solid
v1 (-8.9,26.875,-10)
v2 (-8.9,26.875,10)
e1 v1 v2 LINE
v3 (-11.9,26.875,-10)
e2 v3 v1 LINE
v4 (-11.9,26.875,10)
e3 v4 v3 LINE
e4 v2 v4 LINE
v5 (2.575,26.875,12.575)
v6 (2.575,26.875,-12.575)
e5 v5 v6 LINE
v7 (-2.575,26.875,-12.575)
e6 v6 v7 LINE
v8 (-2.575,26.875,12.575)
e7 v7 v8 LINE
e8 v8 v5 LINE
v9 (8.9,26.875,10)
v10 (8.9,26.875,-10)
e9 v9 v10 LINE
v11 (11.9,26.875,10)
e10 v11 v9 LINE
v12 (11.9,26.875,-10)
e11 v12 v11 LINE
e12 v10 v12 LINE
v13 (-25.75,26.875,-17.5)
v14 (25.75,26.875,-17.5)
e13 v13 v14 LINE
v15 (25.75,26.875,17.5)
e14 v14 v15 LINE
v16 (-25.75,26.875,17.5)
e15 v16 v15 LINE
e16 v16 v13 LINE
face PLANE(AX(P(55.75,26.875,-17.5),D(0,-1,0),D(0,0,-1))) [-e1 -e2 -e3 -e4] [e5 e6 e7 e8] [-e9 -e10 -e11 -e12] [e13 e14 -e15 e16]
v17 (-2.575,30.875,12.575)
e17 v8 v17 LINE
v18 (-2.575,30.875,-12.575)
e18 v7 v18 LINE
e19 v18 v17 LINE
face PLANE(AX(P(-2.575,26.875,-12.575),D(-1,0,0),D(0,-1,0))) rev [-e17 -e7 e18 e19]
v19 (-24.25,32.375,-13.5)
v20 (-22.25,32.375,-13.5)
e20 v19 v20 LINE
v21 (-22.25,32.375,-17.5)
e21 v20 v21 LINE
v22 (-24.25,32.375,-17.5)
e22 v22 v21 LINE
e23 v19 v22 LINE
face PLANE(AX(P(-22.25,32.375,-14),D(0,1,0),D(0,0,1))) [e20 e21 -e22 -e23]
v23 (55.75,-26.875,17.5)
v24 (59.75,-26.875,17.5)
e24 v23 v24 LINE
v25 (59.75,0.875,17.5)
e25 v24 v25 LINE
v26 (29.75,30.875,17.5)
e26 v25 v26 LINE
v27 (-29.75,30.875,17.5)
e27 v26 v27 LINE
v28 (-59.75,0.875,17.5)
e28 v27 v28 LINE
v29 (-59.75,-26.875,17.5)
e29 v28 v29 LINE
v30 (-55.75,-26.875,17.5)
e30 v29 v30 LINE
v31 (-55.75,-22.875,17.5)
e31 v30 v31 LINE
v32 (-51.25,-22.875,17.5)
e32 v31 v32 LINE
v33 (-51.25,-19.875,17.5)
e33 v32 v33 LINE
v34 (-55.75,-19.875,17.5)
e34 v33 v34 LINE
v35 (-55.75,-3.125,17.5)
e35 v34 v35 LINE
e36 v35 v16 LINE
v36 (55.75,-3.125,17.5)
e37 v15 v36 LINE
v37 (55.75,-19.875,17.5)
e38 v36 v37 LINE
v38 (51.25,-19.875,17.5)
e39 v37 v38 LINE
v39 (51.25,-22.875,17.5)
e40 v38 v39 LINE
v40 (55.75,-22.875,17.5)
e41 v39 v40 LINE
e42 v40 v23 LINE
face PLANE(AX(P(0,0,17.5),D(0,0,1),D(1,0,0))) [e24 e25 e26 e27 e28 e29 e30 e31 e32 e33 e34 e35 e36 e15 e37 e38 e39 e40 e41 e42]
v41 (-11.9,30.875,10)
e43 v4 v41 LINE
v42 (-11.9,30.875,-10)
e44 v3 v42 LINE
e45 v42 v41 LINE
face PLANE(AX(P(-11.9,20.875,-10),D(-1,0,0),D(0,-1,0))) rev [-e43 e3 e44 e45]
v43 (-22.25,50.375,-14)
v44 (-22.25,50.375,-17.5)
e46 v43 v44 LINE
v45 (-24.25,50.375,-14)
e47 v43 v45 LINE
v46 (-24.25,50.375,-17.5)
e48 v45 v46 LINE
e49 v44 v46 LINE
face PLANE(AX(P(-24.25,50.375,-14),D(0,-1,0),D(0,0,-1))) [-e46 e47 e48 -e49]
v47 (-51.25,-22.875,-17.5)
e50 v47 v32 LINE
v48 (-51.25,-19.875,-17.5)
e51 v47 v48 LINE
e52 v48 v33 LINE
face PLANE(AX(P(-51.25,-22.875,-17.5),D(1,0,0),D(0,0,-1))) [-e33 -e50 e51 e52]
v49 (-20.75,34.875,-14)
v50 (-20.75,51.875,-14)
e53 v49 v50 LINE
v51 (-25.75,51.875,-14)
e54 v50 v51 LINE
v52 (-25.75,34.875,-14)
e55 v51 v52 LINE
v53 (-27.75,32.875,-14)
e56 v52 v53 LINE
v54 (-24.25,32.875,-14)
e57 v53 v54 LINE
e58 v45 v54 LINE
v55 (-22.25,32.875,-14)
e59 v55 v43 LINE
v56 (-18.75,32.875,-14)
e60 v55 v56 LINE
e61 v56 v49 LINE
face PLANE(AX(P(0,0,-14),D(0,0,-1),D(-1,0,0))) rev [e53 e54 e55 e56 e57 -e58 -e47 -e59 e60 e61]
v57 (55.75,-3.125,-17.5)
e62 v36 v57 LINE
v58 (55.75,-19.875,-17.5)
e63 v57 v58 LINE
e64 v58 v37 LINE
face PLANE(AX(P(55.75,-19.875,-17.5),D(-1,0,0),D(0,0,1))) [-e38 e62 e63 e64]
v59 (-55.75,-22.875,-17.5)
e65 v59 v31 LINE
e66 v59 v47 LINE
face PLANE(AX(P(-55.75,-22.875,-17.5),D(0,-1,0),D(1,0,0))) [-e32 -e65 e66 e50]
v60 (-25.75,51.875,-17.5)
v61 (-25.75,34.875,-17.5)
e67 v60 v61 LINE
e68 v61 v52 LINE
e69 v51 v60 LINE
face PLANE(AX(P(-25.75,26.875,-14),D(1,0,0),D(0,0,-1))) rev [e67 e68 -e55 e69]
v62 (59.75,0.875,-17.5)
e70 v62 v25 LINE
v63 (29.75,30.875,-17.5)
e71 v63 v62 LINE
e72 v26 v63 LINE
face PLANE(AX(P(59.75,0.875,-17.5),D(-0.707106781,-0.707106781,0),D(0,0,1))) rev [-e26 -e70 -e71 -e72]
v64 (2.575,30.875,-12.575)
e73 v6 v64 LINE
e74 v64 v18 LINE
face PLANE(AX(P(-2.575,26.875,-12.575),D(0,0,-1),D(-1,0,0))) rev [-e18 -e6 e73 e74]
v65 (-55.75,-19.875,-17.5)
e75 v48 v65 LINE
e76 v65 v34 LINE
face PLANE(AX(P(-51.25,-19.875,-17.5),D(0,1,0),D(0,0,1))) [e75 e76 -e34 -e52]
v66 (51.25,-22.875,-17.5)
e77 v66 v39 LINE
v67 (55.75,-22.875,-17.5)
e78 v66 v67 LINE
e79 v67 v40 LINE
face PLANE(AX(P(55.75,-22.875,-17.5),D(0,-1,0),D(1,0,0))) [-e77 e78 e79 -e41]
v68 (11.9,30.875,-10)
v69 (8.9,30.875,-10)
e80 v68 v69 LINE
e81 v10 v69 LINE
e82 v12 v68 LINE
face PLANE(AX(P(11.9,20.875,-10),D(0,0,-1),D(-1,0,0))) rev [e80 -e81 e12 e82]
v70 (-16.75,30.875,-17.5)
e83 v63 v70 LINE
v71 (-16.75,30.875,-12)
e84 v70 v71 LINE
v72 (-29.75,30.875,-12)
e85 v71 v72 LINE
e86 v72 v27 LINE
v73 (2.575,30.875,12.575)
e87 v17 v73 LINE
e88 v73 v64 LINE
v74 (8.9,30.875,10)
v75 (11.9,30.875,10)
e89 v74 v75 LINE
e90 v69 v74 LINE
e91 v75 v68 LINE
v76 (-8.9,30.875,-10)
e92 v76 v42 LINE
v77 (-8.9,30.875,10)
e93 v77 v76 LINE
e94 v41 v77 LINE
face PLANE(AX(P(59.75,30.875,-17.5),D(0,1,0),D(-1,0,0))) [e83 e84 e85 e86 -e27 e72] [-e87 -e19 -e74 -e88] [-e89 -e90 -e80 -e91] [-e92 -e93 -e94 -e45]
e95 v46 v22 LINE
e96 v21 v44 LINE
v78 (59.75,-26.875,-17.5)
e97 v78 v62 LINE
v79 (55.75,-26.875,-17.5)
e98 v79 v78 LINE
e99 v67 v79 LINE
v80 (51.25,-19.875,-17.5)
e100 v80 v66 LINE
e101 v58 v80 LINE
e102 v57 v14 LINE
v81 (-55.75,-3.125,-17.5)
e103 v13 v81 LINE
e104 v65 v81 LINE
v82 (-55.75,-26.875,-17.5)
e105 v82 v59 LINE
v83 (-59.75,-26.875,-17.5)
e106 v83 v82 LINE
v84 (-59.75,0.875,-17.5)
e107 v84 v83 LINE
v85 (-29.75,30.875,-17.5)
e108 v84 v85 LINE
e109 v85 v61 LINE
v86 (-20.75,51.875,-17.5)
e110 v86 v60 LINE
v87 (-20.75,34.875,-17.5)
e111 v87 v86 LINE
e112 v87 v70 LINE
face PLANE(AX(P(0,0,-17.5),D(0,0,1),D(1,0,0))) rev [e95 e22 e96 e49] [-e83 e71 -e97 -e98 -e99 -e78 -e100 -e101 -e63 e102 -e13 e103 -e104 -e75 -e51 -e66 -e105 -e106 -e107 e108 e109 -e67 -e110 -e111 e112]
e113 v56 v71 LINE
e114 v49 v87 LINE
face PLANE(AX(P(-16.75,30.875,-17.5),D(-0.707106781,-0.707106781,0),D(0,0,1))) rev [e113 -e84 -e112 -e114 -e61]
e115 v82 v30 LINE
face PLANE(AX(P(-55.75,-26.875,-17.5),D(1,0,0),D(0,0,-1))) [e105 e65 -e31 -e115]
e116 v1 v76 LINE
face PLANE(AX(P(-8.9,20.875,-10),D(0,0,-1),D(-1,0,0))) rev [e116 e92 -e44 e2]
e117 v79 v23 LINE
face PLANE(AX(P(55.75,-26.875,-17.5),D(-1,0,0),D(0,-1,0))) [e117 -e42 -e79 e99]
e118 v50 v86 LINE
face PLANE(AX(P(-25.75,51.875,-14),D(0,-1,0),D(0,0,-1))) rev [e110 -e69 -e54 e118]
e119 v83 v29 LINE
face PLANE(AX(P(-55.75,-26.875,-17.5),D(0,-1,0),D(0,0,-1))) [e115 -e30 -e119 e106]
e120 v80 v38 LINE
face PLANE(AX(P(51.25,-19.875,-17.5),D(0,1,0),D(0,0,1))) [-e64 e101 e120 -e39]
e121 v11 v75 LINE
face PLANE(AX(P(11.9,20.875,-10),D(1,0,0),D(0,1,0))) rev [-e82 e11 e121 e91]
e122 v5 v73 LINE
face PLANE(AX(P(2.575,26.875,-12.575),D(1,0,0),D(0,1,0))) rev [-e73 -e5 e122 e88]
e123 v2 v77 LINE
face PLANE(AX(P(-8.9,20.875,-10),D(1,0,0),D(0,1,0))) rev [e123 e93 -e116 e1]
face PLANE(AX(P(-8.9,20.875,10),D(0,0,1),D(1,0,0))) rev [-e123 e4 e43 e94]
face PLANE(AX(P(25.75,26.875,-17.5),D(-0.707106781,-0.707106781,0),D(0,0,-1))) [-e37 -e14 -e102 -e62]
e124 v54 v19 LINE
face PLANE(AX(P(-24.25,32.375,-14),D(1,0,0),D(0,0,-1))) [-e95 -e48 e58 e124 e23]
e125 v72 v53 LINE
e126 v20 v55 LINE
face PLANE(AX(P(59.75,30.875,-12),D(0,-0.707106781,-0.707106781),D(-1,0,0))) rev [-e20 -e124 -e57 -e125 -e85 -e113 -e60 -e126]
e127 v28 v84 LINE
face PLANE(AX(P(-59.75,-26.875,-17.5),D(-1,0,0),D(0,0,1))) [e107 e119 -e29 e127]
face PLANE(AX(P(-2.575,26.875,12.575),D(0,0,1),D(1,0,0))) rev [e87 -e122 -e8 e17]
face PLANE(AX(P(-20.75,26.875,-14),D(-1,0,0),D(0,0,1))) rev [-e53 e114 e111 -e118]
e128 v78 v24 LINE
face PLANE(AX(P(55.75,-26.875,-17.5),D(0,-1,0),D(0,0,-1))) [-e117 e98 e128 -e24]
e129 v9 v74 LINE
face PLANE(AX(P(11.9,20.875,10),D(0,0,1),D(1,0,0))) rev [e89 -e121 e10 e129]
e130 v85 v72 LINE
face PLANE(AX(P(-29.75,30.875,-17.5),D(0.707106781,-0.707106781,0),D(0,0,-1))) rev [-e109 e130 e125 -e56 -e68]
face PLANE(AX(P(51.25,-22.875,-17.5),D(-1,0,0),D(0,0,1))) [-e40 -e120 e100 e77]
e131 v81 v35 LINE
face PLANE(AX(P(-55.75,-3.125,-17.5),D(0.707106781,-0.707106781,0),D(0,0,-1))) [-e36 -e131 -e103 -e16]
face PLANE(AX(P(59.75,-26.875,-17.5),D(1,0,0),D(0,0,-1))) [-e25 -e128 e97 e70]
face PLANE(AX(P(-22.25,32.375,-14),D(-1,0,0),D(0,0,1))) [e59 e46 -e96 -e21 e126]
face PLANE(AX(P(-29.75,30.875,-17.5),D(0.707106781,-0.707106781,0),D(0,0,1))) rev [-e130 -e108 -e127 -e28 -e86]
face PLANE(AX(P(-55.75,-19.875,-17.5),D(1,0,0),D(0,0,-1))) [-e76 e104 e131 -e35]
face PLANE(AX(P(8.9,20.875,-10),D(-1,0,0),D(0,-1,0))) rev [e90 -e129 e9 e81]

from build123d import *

# Parameters (mm, degrees)
BOSS_EXTRUDE1_DEPTH = 17.5
CHAMFER1_SIZE       = 30
SKETCH6_W           = 5.15
SKETCH6_H           = 25.15
CUT_EXTRUDE2_DEPTH  = 4
SKETCH7_W           = 3
SKETCH7_H           = 20
CUT_EXTRUDE3_DEPTH  = 10
SKETCH8_W           = 5
SKETCH8_H           = 25
SKETCH8_W_2         = 2
SKETCH8_H_2         = 18
BOSS_EXTRUDE2_DEPTH = 3.5
CHAMFER2_SIZE       = 4
CHAMFER3_SIZE       = 2


# Some blends are built 0.0001 mm under size
with BuildPart() as part:
    # Sketch1 → Boss-Extrude1 (new, symmetric)
    with BuildSketch(Plane.XY):
        Polygon((55.75, -26.875), (55.75, -22.875), (51.25, -22.875), (51.25, -19.875), (55.75, -19.875), (55.75, 26.875), (-55.75, 26.875), (-55.75, -19.875), (-51.25, -19.875), (-51.25, -22.875), (-55.75, -22.875), (-55.75, -26.875), (-59.75, -26.875), (-59.75, 30.875), (59.75, 30.875), (59.75, -26.875), align=None)
    extrude(amount=BOSS_EXTRUDE1_DEPTH, both=True)

    # Chamfer1
    chamfer1_edges = [part.edges().sort_by_distance(p)[0] for p in [
        (-59.75, 30.875, 0),
        (59.75, 30.875, 0),
        (55.75, 26.875, 0),
        (-55.75, 26.875, 0),
    ]]
    chamfer(chamfer1_edges, length=CHAMFER1_SIZE)

    # Sketch6 → Cut-Extrude2 (cut)
    with BuildSketch(Plane(origin=(0, 30.875, 0), x_dir=(1, 0, 0), z_dir=(0, 1, 0))):
        Rectangle(SKETCH6_W, SKETCH6_H)
    extrude(amount=-CUT_EXTRUDE2_DEPTH, mode=Mode.SUBTRACT)

    # Sketch7 → Cut-Extrude3 (cut)
    with BuildSketch(Plane(origin=(0, 30.875, 0), x_dir=(1, 0, 0), z_dir=(0, 1, 0))):
        with Locations((10.4, 0)):
            Rectangle(SKETCH7_W, SKETCH7_H)
        with Locations((-10.4, 0)):
            Rectangle(SKETCH7_W, SKETCH7_H)
    extrude(amount=-CUT_EXTRUDE3_DEPTH, mode=Mode.SUBTRACT)

    # Sketch8 → Boss-Extrude2 (add)
    with BuildSketch(Plane.XY.offset(-17.5)):
        with Locations((-23.25, 39.375)):
            Rectangle(SKETCH8_W, SKETCH8_H)
        with Locations((-23.25, 41.375)):
            Rectangle(SKETCH8_W_2, SKETCH8_H_2, mode=Mode.SUBTRACT)
    extrude(amount=BOSS_EXTRUDE2_DEPTH)

    # Chamfer2
    chamfer2_edges = [part.edges().sort_by_distance(p)[0] for p in [
        (-20.75, 30.875, -15.75),
        (-25.75, 30.875, -15.75),
    ]]
    chamfer(chamfer2_edges, length=CHAMFER2_SIZE - 0.0001)  # a hair under: the kernel refuses the full size

    # Chamfer3
    # the kernel refuses this chamfer: 2 mm, written as the material it adds along each edge
    with BuildSketch(Plane(origin=(-11.606734024, 30.875, -14), x_dir=(0, 0.9996219169112968, -0.02749587661058651), z_dir=(-1, 0, 0))) as chamfer3_piece_1_section:
        Polygon((CHAMFER3_SIZE * 0.999621916911, -CHAMFER3_SIZE * 0.0274958766106), (-CHAMFER3_SIZE * 0.0274958766106, -CHAMFER3_SIZE * 0.999621916911), (0, 0), align=None)
    chamfer3_piece_1 = extrude(amount=23.286531952, mode=Mode.PRIVATE)
    chamfer3_piece_1 = split(chamfer3_piece_1, bisect_by=Plane(origin=(-22.25, 32.567452132, -13.881504022), z_dir=(1, 0, 0)), keep=Keep.TOP, mode=Mode.PRIVATE)
    chamfer3_piece_1 = split(chamfer3_piece_1, bisect_by=Plane(origin=(-19.394414099, 33.519314099, -13.881504022), z_dir=(-0.7071067811865476, -0.7071067811865476, 0)), keep=Keep.TOP, mode=Mode.PRIVATE)
    chamfer3_piece_1 = split(chamfer3_piece_1, bisect_by=Plane(origin=(-20.346276066, 32.375, -13.881504022), z_dir=(0, 1, 0)), keep=Keep.TOP, mode=Mode.PRIVATE)
    add(chamfer3_piece_1)
    with BuildSketch(Plane(origin=(-11.606734024, 30.875, -14), x_dir=(0, 0.9996219169112968, -0.02749587661058651), z_dir=(-1, 0, 0))) as chamfer3_piece_2_section:
        Polygon((CHAMFER3_SIZE * 0.999621916911, -CHAMFER3_SIZE * 0.0274958766106), (-CHAMFER3_SIZE * 0.0274958766106, -CHAMFER3_SIZE * 0.999621916911), (0, 0), align=None)
    chamfer3_piece_2 = extrude(amount=23.286531952, mode=Mode.PRIVATE)
    chamfer3_piece_2 = split(chamfer3_piece_2, bisect_by=Plane(origin=(-22.25, 31.41379866, -13.276536182), z_dir=(1, 0, 0)), keep=Keep.TOP, mode=Mode.PRIVATE)
    chamfer3_piece_2 = split(chamfer3_piece_2, bisect_by=Plane(origin=(-18.529173995, 32.654073995, -13.276536182), z_dir=(-0.7071067811865476, -0.7071067811865476, 0)), keep=Keep.TOP, mode=Mode.PRIVATE)
    chamfer3_piece_2 = split(chamfer3_piece_2, bisect_by=Plane(origin=(-19.76944933, 32.375, -13.276536182), z_dir=(0, -1, 0)), keep=Keep.TOP, mode=Mode.PRIVATE)
    add(chamfer3_piece_2)
    with BuildSketch(Plane(origin=(-11.606734024, 30.875, -14), x_dir=(0, 0.9996219169112968, -0.02749587661058651), z_dir=(-1, 0, 0))) as chamfer3_piece_3_section:
        Polygon((CHAMFER3_SIZE * 0.999621916911, -CHAMFER3_SIZE * 0.0274958766106), (-CHAMFER3_SIZE * 0.0274958766106, -CHAMFER3_SIZE * 0.999621916911), (0, 0), align=None)
    chamfer3_piece_3 = extrude(amount=23.286531952, mode=Mode.PRIVATE)
    chamfer3_piece_3 = split(chamfer3_piece_3, bisect_by=Plane(origin=(-22.25, 31.449972825, -13.29608178), z_dir=(-1, 0, 0)), keep=Keep.TOP, mode=Mode.PRIVATE)
    chamfer3_piece_3 = split(chamfer3_piece_3, bisect_by=Plane(origin=(-23.25, 32.375, -13.29608178), z_dir=(0, -1, 0)), keep=Keep.TOP, mode=Mode.PRIVATE)
    chamfer3_piece_3 = split(chamfer3_piece_3, bisect_by=Plane(origin=(-24.25, 31.449972825, -13.29608178), z_dir=(1, 0, 0)), keep=Keep.TOP, mode=Mode.PRIVATE)
    add(chamfer3_piece_3)
    with BuildSketch(Plane(origin=(-11.606734024, 30.875, -14), x_dir=(0, 0.9996219169112968, -0.02749587661058651), z_dir=(-1, 0, 0))) as chamfer3_piece_4_section:
        Polygon((CHAMFER3_SIZE * 0.999621916911, -CHAMFER3_SIZE * 0.0274958766106), (-CHAMFER3_SIZE * 0.0274958766106, -CHAMFER3_SIZE * 0.999621916911), (0, 0), align=None)
    chamfer3_piece_4 = extrude(amount=23.286531952, mode=Mode.PRIVATE)
    chamfer3_piece_4 = split(chamfer3_piece_4, bisect_by=Plane(origin=(-27.105585901, 33.519314099, -13.881504022), z_dir=(0.7071067811865472, -0.7071067811865478, 0)), keep=Keep.TOP, mode=Mode.PRIVATE)
    chamfer3_piece_4 = split(chamfer3_piece_4, bisect_by=Plane(origin=(-26.153723934, 32.375, -13.881504022), z_dir=(0, 1, 0)), keep=Keep.TOP, mode=Mode.PRIVATE)
    chamfer3_piece_4 = split(chamfer3_piece_4, bisect_by=Plane(origin=(-24.25, 32.567452132, -13.881504022), z_dir=(-1, 0, 0)), keep=Keep.TOP, mode=Mode.PRIVATE)
    add(chamfer3_piece_4)
    with BuildSketch(Plane(origin=(-11.606734024, 30.875, -14), x_dir=(0, 0.9996219169112968, -0.02749587661058651), z_dir=(-1, 0, 0))) as chamfer3_piece_5_section:
        Polygon((CHAMFER3_SIZE * 0.999621916911, -CHAMFER3_SIZE * 0.0274958766106), (-CHAMFER3_SIZE * 0.0274958766106, -CHAMFER3_SIZE * 0.999621916911), (0, 0), align=None)
    chamfer3_piece_5 = extrude(amount=23.286531952, mode=Mode.PRIVATE)
    chamfer3_piece_5 = split(chamfer3_piece_5, bisect_by=Plane(origin=(-27.970826005, 32.654073995, -13.276536182), z_dir=(0.7071067811865472, -0.7071067811865478, 0)), keep=Keep.TOP, mode=Mode.PRIVATE)
    chamfer3_piece_5 = split(chamfer3_piece_5, bisect_by=Plane(origin=(-26.73055067, 32.375, -13.276536182), z_dir=(0, -1, 0)), keep=Keep.TOP, mode=Mode.PRIVATE)
    chamfer3_piece_5 = split(chamfer3_piece_5, bisect_by=Plane(origin=(-24.25, 31.41379866, -13.276536182), z_dir=(-1, 0, 0)), keep=Keep.TOP, mode=Mode.PRIVATE)
    add(chamfer3_piece_5)


solid = part.part
